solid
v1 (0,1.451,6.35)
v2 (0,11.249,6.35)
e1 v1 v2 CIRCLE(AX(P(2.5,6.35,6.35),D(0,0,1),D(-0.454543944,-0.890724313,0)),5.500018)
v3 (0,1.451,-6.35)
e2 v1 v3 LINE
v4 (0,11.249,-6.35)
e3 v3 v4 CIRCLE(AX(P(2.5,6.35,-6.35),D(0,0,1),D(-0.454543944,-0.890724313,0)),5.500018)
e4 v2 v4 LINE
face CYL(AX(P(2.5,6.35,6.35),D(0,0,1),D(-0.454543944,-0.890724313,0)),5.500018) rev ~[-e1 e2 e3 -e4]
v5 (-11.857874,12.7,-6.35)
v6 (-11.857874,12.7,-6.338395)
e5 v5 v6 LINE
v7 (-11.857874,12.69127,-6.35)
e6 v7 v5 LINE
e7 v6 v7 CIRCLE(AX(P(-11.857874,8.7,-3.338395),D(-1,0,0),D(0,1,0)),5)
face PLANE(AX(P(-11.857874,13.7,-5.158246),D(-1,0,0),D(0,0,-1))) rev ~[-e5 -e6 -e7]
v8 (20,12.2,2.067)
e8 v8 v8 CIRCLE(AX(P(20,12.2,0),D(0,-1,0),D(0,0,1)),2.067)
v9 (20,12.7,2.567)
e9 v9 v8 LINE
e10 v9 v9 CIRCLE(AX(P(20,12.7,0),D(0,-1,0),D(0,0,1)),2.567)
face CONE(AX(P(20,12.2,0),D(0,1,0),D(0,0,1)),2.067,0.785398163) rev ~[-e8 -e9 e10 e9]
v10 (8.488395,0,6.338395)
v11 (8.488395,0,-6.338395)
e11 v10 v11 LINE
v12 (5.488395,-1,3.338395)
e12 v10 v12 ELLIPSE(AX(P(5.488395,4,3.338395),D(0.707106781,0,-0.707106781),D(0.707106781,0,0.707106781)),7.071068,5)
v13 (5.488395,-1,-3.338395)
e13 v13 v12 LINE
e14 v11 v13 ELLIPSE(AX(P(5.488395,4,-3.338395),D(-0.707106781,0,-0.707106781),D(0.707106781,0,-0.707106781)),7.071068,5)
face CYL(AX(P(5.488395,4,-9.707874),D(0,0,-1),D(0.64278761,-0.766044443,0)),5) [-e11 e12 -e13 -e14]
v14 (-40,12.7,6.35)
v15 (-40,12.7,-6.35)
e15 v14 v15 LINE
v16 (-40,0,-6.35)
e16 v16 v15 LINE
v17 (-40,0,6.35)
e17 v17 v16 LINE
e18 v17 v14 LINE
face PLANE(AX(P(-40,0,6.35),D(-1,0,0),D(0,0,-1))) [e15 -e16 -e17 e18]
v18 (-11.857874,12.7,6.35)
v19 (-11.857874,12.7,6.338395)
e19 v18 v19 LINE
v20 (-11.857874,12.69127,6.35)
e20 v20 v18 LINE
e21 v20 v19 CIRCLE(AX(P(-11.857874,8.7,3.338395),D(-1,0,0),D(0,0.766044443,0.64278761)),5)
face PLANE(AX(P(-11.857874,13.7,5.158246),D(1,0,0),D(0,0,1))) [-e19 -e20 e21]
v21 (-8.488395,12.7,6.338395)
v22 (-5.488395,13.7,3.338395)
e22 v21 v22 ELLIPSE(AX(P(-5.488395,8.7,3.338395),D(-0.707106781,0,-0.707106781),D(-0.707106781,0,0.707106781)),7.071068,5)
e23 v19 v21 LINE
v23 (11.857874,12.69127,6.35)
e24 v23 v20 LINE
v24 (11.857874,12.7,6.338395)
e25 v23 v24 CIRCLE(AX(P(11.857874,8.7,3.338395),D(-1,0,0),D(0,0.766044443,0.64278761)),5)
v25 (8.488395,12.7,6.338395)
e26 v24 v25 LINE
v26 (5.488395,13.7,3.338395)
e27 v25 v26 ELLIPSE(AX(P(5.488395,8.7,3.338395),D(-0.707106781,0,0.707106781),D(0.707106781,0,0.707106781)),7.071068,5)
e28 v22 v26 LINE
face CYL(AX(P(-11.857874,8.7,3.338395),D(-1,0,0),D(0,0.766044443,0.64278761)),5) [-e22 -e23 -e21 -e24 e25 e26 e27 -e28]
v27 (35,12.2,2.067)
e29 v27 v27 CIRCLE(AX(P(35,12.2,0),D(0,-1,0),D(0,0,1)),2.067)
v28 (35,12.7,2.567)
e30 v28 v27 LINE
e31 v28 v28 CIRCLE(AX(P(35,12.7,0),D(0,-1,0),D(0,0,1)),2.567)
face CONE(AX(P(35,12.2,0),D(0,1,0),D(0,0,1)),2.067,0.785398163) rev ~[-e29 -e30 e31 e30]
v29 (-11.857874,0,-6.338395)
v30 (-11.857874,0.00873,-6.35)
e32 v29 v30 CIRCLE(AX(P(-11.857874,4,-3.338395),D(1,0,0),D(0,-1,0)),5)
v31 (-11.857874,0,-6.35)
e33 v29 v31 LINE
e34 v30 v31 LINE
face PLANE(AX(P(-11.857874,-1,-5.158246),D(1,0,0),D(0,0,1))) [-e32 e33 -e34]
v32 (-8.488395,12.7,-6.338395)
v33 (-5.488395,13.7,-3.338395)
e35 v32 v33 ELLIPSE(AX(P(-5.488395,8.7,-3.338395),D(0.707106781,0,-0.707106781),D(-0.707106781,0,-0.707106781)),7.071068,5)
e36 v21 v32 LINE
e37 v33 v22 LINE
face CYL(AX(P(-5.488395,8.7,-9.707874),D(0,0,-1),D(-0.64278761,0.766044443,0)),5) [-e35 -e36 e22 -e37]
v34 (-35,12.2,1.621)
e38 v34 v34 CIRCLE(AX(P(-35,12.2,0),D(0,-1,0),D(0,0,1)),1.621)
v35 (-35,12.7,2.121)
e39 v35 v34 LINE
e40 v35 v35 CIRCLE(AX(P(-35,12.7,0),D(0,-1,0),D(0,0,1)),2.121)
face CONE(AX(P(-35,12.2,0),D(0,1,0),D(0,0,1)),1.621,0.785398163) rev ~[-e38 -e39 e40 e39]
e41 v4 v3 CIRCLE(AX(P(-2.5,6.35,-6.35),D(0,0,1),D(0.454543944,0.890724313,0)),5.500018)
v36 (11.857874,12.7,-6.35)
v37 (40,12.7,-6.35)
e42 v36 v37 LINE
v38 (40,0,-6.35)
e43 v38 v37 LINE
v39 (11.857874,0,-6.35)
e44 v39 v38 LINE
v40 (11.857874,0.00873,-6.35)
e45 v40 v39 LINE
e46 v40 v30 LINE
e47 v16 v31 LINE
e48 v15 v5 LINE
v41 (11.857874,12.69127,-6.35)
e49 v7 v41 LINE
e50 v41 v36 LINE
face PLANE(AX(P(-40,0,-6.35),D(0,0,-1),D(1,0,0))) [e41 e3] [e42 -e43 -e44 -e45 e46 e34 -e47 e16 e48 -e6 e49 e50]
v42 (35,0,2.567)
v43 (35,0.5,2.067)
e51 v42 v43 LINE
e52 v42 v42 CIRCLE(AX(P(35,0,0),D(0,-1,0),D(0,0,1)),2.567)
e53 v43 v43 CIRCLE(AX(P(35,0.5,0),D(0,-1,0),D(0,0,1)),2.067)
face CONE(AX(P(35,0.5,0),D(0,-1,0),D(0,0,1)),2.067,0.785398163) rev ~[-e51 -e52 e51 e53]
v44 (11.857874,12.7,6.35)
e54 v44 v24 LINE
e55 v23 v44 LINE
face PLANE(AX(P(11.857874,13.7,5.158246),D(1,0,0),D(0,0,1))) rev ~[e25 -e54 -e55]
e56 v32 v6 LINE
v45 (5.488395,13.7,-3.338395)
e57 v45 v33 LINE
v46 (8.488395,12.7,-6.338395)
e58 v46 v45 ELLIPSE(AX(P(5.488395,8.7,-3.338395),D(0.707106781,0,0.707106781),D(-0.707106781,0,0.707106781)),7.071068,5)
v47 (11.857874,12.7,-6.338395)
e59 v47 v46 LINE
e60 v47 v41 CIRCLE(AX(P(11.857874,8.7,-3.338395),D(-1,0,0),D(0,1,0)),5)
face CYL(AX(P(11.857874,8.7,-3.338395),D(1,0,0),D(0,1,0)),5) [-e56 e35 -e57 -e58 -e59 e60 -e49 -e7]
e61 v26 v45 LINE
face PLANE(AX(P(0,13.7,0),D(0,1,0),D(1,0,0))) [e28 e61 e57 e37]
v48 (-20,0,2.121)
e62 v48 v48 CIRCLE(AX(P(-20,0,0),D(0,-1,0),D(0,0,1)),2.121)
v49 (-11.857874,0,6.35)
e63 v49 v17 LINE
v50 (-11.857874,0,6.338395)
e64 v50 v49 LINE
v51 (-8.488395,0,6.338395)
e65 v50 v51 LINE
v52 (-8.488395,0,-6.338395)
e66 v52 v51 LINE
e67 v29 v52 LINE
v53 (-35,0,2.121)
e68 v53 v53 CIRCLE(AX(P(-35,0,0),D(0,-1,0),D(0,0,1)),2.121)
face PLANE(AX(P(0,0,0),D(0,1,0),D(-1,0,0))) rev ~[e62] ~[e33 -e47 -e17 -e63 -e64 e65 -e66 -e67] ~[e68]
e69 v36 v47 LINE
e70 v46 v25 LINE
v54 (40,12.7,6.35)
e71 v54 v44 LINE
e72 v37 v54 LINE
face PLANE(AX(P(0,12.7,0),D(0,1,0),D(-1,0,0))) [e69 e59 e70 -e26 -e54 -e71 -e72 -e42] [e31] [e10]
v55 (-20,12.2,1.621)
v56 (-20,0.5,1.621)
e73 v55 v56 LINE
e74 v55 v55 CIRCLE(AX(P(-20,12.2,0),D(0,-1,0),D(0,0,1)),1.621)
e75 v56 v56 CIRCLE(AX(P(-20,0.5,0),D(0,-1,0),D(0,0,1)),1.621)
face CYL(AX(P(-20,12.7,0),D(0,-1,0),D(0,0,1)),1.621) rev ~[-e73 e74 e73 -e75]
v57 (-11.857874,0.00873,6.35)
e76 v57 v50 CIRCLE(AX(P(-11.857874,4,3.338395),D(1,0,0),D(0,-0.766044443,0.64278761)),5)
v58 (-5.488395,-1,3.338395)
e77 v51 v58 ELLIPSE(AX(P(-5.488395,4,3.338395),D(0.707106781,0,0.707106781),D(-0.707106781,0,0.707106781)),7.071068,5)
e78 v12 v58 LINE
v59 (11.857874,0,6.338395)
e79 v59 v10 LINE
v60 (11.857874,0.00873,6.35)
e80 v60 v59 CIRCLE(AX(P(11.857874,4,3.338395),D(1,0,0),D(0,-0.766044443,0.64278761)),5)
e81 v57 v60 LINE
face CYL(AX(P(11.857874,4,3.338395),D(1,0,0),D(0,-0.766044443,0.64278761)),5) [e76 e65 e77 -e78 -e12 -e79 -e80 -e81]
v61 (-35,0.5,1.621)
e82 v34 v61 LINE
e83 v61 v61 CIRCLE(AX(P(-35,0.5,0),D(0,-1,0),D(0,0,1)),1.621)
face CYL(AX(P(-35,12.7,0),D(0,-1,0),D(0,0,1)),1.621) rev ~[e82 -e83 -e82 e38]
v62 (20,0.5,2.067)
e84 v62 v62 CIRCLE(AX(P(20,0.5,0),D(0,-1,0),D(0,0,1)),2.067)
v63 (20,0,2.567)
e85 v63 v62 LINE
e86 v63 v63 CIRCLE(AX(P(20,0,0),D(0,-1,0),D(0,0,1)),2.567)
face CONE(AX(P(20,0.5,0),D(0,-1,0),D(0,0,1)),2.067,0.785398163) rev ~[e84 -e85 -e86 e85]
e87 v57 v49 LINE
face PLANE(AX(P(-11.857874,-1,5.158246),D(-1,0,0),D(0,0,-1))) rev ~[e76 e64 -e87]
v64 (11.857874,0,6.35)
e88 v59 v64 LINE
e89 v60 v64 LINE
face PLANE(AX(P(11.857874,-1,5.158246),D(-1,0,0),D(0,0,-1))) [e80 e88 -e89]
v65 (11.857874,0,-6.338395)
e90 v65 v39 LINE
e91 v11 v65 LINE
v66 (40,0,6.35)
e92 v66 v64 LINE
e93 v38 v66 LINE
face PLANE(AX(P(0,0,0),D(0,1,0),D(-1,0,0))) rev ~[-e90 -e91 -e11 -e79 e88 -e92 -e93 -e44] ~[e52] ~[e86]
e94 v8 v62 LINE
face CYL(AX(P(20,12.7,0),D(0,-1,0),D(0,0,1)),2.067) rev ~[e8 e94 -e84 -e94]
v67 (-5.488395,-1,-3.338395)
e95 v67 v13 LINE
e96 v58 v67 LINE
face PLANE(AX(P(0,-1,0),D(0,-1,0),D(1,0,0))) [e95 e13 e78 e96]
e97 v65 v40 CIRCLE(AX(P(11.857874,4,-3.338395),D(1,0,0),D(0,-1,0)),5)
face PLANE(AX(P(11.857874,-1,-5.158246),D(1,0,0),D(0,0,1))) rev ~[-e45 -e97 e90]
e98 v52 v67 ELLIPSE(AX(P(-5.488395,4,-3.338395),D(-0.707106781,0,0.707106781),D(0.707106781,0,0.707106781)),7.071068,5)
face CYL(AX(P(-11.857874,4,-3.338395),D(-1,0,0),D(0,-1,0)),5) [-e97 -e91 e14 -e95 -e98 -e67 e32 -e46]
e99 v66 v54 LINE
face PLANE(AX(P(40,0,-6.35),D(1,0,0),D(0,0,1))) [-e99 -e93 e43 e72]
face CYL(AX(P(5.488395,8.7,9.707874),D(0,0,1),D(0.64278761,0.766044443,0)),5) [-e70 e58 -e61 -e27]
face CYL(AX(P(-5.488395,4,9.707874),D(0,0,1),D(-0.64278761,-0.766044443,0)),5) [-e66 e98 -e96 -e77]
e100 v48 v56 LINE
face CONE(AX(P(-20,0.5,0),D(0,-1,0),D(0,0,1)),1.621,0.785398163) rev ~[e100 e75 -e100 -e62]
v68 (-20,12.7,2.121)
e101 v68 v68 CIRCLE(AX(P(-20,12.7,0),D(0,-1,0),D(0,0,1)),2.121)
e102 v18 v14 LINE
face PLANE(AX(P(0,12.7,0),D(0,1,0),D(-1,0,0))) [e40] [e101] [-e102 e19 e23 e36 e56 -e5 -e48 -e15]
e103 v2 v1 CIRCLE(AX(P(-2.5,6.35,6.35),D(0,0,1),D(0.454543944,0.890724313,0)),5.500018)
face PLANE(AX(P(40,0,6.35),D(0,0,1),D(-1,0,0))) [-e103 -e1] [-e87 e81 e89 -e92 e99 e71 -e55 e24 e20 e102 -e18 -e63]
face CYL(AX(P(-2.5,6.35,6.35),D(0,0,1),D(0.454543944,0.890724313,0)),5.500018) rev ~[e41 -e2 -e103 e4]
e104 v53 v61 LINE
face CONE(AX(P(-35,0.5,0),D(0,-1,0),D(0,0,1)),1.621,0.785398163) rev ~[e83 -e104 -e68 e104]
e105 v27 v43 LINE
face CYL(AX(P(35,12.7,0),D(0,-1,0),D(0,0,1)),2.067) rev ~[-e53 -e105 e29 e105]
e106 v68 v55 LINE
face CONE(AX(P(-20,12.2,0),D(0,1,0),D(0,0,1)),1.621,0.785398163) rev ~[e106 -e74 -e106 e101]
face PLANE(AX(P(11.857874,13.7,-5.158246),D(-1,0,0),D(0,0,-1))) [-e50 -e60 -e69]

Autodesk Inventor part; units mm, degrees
ref_plane "YZ Plane" through (0, 0, 0) normal (1, 0, 0) x (0, 1, 0)
ref_plane "XZ Plane" through (0, 0, 0) normal (0, 1, 0) x (-1, 0, 0)
ref_plane "XY Plane" through (0, 0, 0) normal (0, 0, 1) x (1, 0, 0)
sketch "Эскиз1" plane through (0, 0, 0) normal (0, 1, 0) x (-1, 0, 0)
  line L0 (-40, 6.35) -> (40, 6.35)
  line L1 (40, 6.35) -> (40, -6.35)
  line L2 (40, -6.35) -> (-40, -6.35)
  line L3 (-40, -6.35) -> (-40, 6.35)
  line L4 (-40, 6.35) -> (40, -6.35) construction
  line L5 (40, 6.35) -> (-40, -6.35) construction
  point P0 (0, 0)
  dimension "d0" = 80
  dimension "d1" = 12.7
extrude "Выдавливание1" add sketch "Эскиз1" along normal blind 12.7
sketch "Эскиз2" plane through (0, 12.7, 0) normal (0, 1, 0) x (1, 0, 0)
  point P0 (0, 0)
  point P1 (-35, 0)
  point P2 (-20, 0)
  point P3 (20, 0)
  point P4 (35, 0)
  dimension "d4" = 15
  dimension "d5" = 40
  dimension "d6" = 15
  dimension "d7" = 20
hole "Отверстие1" at (-35, 12.7, 0) at (-20, 12.7, 0) direction (0, -1, 0) diameter 3.242 end through all thread size "M4x0.7" class "6H" standard "ISO Metric profile"
hole "Отверстие2" at (20, 12.7, 0) at (35, 12.7, 0) direction (0, -1, 0) diameter 4.134 end through all thread size "M5x0.8" class "6H" standard "ISO Metric profile"
sketch "Эскиз3" plane through (-40, 0, 6.35) normal (0, 0, 1) x (1, 0, 0)
  line L0 (80, 0) -> (0, 0) projected
  arc A0 (40, 11.249) -> (40, 1.451) centre (37.5, 6.35) ccw
  arc A1 (40, 1.451) -> (40, 11.249) centre (42.5, 6.35) ccw
  line L1 (80, 0) -> (80, 12.7) projected
  point P0 (40, 0)
  point P1 (40, 0)
  point P2 (80, 6.35)
  dimension "d22" = 11
  dimension "d23" = 11
  dimension "d24" = 5
extrude "Выдавливание2" cut sketch "Эскиз3" against normal through all
sketch "Эскиз4" plane through (0, 12.7, 0) normal (0, 1, 0) x (1, 0, 0)
  line L0 (40, 6.35) -> (-40, 6.35) projected
  line L1 (-8.5, -6.35) -> (8.5, -6.35)
  line L2 (8.5, -6.35) -> (8.5, 6.35)
  line L3 (8.5, 6.35) -> (-8.5, 6.35)
  line L4 (-8.5, 6.35) -> (-8.5, -6.35)
  line L5 (-8.5, -6.35) -> (8.5, 6.35) construction
  line L6 (8.5, -6.35) -> (-8.5, 6.35) construction
  point P0 (0, 0)
  dimension "d27" = 17
extrude "Выдавливание3" add sketch "Эскиз4" along normal blind 1 draft -50
fillet "Сопряжение1" radius 5 4 edges at (7.3082, 13.7, 0) (0, 13.7, 5.1582) (-7.3082, 13.7, 0) (0, 13.7, -5.1582)
sketch "Эскиз5" plane through (0, 0, 0) normal (0, -1, 0) x (1, 0, 0)
  line L0 (40, 6.35) -> (-40, 6.35) projected
  line L1 (-8.5, -6.35) -> (8.5, -6.35)
  line L2 (8.5, -6.35) -> (8.5, 6.35)
  line L3 (8.5, 6.35) -> (-8.5, 6.35)
  line L4 (-8.5, 6.35) -> (-8.5, -6.35)
  line L5 (-8.5, -6.35) -> (8.5, 6.35) construction
  line L6 (8.5, -6.35) -> (-8.5, 6.35) construction
  point P0 (0, 0)
  dimension "d31" = 17
extrude "Выдавливание4" add sketch "Эскиз5" along normal blind 1 draft -50
fillet "Сопряжение2" radius 5 4 edges at (-7.3082, -1, 0) (0, -1, 5.1582) (7.3082, -1, 0) (0, -1, -5.1582)
chamfer "Фаска1" distance 0.5 angle 45 8 edges at (-35, 12.7, -1.621) (-20, 12.7, -1.621) (20, 12.7, -2.067) (35, 12.7, -2.067) (20, 0, -2.067) (35, 0, -2.067) (-20, 0, -1.621) (-35, 0, -1.621)
properties part number "Weight Sensor" material "Алюминий 6061-AHC"
